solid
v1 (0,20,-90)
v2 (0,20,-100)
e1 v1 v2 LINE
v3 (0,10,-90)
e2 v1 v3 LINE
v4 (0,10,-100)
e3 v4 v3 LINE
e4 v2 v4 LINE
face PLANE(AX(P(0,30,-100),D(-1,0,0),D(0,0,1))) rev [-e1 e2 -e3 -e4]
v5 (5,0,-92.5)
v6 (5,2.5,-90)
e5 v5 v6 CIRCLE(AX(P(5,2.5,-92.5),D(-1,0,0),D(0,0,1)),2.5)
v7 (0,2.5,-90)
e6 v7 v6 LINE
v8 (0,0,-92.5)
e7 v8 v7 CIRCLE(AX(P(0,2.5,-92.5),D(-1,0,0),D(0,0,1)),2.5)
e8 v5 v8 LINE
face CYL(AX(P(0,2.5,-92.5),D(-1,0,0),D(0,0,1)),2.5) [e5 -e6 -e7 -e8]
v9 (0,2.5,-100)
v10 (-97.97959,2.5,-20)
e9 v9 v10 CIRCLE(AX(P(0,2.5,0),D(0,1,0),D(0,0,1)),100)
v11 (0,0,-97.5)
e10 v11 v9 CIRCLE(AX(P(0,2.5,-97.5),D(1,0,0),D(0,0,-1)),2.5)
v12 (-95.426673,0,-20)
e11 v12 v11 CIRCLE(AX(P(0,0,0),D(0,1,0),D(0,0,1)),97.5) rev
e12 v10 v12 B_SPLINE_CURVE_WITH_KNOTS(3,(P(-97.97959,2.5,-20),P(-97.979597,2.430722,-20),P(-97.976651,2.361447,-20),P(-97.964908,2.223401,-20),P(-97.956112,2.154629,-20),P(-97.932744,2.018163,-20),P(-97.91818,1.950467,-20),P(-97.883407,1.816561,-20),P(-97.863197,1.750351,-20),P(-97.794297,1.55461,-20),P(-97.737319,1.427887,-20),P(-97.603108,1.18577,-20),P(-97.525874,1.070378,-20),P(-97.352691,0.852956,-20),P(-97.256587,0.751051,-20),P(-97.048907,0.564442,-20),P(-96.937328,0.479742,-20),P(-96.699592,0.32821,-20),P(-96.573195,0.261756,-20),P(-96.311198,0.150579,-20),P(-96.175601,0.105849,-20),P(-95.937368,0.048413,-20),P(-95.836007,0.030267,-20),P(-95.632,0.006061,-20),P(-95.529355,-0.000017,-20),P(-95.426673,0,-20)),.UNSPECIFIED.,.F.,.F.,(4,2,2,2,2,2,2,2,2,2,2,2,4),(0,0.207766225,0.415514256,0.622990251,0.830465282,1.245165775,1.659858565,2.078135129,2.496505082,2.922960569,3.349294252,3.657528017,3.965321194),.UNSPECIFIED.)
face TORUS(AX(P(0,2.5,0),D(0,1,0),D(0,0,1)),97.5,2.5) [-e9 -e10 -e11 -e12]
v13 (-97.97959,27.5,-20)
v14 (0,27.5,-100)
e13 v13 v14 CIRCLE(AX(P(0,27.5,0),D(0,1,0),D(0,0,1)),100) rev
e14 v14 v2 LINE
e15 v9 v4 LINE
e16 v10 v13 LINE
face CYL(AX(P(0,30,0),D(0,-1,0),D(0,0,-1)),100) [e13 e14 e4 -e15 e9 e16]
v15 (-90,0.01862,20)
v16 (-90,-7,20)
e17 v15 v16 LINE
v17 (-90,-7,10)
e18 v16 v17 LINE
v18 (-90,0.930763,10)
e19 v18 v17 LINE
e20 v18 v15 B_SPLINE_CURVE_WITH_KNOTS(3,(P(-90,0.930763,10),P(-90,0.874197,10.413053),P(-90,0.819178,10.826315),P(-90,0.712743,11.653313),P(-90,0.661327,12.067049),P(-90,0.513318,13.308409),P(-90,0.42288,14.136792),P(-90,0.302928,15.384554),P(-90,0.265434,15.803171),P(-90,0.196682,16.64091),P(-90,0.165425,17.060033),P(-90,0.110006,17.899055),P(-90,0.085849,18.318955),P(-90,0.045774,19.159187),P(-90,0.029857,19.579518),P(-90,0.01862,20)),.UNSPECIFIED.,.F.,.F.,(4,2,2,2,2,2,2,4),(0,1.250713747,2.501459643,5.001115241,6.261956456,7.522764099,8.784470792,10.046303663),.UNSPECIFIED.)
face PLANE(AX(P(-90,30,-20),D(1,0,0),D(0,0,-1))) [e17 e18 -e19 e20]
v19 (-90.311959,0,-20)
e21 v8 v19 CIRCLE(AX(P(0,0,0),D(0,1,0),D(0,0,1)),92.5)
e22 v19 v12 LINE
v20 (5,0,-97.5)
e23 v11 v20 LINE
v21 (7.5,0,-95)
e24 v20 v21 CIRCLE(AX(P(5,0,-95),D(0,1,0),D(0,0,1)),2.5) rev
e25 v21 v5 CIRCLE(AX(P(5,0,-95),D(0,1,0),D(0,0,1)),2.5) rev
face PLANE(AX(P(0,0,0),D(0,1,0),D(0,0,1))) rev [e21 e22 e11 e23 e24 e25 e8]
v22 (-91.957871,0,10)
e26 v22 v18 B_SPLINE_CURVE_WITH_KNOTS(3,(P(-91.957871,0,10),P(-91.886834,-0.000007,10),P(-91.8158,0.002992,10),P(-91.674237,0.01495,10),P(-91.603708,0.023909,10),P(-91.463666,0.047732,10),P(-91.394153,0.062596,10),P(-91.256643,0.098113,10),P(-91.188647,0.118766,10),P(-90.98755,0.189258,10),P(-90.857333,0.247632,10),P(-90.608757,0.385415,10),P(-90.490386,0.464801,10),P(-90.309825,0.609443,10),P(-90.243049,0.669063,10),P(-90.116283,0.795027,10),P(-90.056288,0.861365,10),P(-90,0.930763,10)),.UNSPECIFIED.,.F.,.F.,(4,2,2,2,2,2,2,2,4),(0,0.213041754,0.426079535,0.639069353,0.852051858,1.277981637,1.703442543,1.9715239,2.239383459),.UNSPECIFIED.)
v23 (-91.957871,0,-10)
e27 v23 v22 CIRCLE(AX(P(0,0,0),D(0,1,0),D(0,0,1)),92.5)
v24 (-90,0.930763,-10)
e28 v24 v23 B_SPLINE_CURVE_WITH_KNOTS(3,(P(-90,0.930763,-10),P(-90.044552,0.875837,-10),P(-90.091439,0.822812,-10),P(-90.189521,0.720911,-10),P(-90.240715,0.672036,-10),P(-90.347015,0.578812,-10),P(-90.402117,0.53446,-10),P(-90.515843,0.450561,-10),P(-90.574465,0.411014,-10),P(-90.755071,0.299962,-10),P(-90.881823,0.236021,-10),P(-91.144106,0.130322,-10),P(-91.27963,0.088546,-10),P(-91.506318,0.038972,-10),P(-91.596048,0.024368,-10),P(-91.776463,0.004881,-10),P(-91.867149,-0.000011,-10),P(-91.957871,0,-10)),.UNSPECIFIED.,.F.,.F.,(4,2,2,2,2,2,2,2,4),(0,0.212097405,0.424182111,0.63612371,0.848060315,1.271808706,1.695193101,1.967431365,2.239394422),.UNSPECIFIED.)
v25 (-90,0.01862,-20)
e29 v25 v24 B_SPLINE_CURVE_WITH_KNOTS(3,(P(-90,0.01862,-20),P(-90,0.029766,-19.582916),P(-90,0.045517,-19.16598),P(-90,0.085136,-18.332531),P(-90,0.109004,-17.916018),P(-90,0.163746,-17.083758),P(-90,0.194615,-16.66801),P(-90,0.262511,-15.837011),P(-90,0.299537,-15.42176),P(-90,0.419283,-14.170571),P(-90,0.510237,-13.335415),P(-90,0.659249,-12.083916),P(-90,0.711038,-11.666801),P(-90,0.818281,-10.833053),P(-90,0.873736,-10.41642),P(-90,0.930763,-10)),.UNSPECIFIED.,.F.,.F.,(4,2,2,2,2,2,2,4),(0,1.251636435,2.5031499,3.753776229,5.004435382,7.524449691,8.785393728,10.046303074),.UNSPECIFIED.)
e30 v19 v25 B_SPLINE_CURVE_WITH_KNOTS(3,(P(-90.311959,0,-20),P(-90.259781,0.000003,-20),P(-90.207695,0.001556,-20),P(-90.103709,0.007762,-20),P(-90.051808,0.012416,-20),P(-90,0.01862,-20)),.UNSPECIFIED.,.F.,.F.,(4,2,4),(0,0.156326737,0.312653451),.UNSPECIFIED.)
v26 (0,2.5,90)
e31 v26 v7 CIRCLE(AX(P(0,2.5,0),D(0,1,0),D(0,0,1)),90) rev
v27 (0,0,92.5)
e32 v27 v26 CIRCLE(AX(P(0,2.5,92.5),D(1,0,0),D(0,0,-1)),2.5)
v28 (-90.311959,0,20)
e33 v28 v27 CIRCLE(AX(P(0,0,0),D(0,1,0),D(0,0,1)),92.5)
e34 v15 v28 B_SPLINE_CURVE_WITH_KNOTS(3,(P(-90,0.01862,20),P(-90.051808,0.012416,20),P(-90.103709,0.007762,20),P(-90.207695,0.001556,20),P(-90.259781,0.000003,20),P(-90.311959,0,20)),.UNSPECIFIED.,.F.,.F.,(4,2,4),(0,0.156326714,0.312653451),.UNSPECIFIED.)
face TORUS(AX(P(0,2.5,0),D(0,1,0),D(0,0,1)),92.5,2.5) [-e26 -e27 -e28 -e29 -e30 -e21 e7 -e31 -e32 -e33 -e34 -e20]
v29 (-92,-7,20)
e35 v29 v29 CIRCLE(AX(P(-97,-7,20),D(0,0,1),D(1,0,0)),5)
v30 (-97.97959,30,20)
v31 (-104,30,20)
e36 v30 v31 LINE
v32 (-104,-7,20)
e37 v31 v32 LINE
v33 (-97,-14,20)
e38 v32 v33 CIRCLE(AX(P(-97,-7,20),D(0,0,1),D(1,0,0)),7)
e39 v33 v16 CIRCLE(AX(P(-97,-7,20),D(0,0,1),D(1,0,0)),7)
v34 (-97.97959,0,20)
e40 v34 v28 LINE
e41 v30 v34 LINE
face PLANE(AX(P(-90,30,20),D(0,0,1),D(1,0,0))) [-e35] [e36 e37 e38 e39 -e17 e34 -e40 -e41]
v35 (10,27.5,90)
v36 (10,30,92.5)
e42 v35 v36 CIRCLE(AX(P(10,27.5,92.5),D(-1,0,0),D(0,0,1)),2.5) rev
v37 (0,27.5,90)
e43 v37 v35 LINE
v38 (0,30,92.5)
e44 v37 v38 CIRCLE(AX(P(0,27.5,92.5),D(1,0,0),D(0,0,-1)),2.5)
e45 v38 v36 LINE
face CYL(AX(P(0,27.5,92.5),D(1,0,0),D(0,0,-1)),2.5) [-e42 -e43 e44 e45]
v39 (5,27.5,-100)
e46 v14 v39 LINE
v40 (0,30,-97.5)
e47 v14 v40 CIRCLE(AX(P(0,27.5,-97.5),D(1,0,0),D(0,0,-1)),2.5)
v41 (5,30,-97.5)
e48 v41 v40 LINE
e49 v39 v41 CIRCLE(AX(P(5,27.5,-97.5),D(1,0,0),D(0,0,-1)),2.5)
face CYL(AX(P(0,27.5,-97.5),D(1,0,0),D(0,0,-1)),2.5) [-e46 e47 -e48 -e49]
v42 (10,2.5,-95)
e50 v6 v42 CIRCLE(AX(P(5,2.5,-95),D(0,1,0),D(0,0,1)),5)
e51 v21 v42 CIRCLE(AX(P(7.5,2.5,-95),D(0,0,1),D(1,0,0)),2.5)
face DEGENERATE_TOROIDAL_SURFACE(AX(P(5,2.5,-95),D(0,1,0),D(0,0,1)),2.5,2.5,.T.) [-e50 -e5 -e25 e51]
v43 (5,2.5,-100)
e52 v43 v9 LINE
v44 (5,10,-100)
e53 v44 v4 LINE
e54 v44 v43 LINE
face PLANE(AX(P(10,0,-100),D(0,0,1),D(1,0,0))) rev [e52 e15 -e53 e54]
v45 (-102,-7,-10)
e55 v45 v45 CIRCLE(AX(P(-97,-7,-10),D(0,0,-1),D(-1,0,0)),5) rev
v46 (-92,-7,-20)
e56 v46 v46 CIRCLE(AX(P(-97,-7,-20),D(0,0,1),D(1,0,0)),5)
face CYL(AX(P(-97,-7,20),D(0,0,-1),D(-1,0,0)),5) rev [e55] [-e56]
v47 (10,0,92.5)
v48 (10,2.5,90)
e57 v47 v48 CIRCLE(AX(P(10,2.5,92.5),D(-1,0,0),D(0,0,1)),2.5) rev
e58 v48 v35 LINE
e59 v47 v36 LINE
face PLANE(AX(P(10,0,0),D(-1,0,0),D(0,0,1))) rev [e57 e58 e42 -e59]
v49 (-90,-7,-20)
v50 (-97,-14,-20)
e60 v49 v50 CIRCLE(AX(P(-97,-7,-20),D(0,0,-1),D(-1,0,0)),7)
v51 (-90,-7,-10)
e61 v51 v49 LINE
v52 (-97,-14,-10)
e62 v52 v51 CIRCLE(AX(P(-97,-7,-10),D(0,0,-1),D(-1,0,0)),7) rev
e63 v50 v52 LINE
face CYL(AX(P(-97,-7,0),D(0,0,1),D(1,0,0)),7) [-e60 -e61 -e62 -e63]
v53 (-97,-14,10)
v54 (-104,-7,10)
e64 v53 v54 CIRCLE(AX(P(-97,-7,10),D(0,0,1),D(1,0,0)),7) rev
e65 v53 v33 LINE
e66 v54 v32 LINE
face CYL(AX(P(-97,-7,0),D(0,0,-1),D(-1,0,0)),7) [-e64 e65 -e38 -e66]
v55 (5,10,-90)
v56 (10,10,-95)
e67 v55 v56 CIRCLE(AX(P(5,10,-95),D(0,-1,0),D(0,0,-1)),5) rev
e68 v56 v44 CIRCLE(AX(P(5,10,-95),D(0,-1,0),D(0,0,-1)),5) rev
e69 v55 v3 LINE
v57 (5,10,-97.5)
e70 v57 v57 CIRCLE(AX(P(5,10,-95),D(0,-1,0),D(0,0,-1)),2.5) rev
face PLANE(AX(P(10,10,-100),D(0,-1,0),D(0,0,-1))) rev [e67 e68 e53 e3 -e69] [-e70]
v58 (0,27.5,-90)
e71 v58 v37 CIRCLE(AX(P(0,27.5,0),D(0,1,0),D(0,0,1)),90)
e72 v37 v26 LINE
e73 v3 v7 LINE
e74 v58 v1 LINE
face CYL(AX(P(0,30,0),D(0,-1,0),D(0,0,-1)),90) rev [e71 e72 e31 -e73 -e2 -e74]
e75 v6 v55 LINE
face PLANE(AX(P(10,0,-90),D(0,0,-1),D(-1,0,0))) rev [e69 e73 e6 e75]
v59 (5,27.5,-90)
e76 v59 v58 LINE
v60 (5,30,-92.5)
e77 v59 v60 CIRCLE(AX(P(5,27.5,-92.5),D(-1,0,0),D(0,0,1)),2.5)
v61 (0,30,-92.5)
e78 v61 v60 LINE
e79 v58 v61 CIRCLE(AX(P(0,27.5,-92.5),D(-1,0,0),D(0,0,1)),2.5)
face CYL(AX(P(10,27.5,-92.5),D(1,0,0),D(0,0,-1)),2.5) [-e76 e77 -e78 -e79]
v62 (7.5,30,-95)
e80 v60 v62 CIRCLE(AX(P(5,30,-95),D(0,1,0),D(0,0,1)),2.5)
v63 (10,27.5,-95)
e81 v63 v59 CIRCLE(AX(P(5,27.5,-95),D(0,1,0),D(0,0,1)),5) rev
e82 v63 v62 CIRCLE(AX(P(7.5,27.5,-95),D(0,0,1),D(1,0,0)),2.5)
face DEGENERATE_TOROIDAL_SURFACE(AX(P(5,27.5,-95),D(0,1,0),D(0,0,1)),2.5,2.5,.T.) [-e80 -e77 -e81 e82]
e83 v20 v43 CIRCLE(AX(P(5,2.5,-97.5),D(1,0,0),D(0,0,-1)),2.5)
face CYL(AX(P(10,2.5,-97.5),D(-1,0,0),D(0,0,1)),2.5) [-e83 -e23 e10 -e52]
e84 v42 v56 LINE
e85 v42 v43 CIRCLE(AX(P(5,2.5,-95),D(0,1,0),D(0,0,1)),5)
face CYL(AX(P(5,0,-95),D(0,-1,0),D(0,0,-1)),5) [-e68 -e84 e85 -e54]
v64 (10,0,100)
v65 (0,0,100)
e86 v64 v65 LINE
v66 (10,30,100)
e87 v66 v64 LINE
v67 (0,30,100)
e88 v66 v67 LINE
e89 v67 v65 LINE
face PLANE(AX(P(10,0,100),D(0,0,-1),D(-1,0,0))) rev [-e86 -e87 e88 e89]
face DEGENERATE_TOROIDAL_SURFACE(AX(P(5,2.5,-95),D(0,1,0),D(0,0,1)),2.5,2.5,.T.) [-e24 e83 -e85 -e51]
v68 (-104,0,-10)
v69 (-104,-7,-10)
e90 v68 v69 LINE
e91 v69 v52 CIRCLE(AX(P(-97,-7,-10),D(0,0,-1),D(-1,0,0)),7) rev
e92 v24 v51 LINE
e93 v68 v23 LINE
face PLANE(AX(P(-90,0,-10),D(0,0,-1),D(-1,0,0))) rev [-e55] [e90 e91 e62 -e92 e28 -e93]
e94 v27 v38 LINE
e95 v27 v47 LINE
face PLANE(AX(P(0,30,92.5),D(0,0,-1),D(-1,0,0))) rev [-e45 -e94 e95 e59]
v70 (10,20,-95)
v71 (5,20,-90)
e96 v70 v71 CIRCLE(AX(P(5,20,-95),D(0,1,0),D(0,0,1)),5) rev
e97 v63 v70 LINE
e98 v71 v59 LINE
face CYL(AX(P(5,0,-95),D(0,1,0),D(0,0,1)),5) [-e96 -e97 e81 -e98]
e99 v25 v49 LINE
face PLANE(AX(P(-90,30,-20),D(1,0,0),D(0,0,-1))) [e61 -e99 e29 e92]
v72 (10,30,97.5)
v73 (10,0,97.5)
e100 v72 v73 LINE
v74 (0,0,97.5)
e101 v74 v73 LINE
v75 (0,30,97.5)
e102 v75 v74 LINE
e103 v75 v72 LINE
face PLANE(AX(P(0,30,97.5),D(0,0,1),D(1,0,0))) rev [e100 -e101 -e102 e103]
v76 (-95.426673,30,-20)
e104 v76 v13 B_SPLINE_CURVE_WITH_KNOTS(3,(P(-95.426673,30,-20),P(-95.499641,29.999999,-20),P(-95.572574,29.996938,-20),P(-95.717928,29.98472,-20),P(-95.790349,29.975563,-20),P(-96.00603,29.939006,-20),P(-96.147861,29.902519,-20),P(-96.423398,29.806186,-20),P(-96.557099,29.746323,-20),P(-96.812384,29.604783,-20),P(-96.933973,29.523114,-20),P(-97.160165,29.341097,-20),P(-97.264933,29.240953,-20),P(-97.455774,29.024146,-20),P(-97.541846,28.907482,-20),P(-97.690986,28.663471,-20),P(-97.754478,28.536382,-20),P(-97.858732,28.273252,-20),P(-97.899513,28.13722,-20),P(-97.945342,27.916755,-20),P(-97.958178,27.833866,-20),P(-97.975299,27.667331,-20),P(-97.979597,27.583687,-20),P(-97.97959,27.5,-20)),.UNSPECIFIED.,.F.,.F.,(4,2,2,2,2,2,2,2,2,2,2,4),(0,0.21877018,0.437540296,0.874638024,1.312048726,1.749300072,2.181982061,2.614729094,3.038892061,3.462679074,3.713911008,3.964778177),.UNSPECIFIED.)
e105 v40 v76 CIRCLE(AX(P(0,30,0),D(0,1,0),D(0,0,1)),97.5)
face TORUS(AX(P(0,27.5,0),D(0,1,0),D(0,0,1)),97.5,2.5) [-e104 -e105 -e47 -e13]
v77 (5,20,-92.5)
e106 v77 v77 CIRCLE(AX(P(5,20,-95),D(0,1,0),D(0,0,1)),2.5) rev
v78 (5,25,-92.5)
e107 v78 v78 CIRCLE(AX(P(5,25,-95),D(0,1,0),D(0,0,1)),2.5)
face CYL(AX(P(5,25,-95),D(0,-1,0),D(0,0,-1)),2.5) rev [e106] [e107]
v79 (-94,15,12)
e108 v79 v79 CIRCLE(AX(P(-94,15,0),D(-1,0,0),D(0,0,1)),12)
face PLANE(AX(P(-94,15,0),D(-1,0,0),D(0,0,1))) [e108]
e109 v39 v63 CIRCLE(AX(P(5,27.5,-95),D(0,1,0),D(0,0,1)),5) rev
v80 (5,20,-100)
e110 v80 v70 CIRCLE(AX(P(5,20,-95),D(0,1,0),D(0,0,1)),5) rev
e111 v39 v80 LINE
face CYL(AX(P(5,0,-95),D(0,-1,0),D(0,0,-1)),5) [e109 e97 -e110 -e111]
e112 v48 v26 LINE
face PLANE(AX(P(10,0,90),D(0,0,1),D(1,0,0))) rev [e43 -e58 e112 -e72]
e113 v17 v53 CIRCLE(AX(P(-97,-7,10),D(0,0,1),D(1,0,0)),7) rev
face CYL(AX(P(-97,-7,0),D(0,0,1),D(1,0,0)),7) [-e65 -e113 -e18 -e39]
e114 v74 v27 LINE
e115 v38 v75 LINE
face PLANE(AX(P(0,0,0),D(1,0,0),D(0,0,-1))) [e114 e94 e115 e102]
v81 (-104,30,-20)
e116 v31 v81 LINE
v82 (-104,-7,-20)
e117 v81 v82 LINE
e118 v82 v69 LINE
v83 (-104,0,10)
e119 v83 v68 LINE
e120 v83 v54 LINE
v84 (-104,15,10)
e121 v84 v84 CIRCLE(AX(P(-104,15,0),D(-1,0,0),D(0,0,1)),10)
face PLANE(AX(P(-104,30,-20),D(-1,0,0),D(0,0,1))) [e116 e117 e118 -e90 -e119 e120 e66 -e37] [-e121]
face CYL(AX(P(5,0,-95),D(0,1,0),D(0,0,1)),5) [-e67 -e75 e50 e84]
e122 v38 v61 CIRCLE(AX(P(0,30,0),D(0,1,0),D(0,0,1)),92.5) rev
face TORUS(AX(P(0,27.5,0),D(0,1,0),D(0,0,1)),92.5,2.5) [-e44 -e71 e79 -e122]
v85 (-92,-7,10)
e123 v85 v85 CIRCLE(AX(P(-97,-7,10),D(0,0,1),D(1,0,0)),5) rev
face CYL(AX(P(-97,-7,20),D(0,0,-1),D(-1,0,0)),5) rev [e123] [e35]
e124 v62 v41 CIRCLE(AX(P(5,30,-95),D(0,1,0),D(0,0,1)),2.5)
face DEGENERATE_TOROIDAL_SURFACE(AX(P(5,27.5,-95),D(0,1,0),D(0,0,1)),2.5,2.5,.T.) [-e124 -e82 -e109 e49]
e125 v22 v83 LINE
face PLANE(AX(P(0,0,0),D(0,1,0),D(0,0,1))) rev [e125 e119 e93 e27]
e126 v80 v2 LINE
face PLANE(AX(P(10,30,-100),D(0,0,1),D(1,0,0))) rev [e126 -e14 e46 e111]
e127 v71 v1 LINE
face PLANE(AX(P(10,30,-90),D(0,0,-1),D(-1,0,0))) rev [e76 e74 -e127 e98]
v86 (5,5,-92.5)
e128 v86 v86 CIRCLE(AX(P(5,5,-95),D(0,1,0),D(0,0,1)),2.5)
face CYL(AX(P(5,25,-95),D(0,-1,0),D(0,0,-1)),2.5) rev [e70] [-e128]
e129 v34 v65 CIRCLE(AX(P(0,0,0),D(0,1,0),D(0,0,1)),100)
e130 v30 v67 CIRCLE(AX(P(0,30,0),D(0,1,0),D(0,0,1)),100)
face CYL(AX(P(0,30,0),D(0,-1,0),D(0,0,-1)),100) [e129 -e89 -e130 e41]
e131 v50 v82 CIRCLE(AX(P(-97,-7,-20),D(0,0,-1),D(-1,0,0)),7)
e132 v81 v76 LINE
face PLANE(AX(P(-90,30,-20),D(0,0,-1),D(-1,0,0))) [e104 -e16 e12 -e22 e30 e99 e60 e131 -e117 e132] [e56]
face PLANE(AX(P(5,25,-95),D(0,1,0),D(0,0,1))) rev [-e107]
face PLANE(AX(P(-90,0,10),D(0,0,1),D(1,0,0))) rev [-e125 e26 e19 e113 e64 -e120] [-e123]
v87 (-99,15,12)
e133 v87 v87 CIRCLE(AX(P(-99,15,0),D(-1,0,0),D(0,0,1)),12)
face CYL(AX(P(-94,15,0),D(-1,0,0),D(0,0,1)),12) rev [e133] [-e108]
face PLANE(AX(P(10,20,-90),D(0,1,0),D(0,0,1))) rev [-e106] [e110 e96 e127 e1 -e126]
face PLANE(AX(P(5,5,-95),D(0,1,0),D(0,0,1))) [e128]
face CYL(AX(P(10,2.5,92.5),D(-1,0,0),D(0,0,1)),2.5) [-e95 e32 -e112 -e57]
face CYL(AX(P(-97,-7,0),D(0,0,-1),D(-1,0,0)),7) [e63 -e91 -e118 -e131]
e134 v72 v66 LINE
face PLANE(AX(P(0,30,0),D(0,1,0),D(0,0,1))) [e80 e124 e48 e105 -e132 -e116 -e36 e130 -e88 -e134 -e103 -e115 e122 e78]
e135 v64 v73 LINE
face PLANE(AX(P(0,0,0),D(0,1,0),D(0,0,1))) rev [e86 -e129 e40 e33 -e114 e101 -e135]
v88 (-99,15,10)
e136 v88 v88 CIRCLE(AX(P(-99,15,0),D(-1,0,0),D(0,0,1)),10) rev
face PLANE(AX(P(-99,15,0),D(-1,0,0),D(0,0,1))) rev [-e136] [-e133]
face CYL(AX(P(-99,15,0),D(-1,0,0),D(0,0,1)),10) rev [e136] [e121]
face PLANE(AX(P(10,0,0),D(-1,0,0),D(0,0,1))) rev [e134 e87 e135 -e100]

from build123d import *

# Parameters (mm, degrees)
BOSS_EXTRUDE1_DEPTH      = 30
BOSS_EXTRUDE2_DEPTH      = 14
BOSS_EXTRUDE2_DEPTH_BACK = 30
SKETCH2_W                = 14
SKETCH2_H                = 40
SKETCH3_W                = 14
SKETCH3_H                = 20
CUT_EXTRUDE1_DEPTH       = 14
CUT_EXTRUDE2_DEPTH       = 20
CUT_EXTRUDE2_DEPTH_BACK  = 20
SKETCH5_R                = 5
SKETCH6_W                = 10
SKETCH6_H                = 10
BOSS_EXTRUDE3_DEPTH      = 10
CUT_EXTRUDE3_DEPTH       = 15
CUT_EXTRUDE3_DEPTH_BACK  = 5
SKETCH7_R                = 2.5
SKETCH8_W                = 10
SKETCH8_H                = 30
BOSS_EXTRUDE4_DEPTH      = 10
SKETCH9_W                = 5
SKETCH9_H                = 30
CUT_EXTRUDE4_DEPTH       = 10
SKETCH10_R               = 10
CUT_EXTRUDE5_DEPTH       = 5
SKETCH11_R               = 12
CUT_EXTRUDE6_DEPTH       = 5
FILLET1_R                = 7
FILLET3_R                = 5
FILLET2_R                = 2.5


# Some blends are built 0.0001 mm under size
with BuildPart() as part:
    # Sketch1 → Boss-Extrude1 (new body)
    with BuildSketch(Plane(origin=(0, 0, 0), x_dir=(1, 0, 0), z_dir=(0, 1, 0))):
        with BuildLine():
            Line((0, 100), (0, 90))
            ThreePointArc((0, 90), (-90, 0), (0, -90))
            Line((0, -90), (0, -100))
            ThreePointArc((0, -100), (-100, 0), (0, 100))
        make_face()
    extrude(amount=BOSS_EXTRUDE1_DEPTH)

    # Sketch2 → Boss-Extrude2 (add, two sides: drawn at the far end of the back side and taken through both)
    with BuildSketch(Plane.XZ.offset(-BOSS_EXTRUDE2_DEPTH_BACK)):
        with Locations((-97, 0)):
            Rectangle(SKETCH2_W, SKETCH2_H)
    extrude(amount=BOSS_EXTRUDE2_DEPTH + BOSS_EXTRUDE2_DEPTH_BACK)

    # Sketch3 → Cut-Extrude1 (cut)
    with BuildSketch(Plane.XZ.offset(14)):
        with Locations((-97, 0)):
            Rectangle(SKETCH3_W, SKETCH3_H)
    extrude(amount=-CUT_EXTRUDE1_DEPTH, mode=Mode.SUBTRACT)

    # Sketch5 → Cut-Extrude2 (cut, two sides: drawn at the far end of the back side and taken through both)
    with BuildSketch(Plane.XY.offset(-CUT_EXTRUDE2_DEPTH_BACK)):
        with Locations((-97, -7)):
            Circle(SKETCH5_R)
    extrude(amount=CUT_EXTRUDE2_DEPTH + CUT_EXTRUDE2_DEPTH_BACK, mode=Mode.SUBTRACT)

    # Sketch6 → Boss-Extrude3 (add)
    with BuildSketch(Plane(origin=(0, 0, 0), x_dir=(0, 0, -1), z_dir=(1, 0, 0))):
        with Locations((95, 25)):
            Rectangle(SKETCH6_W, SKETCH6_H)
        with Locations((95, 5)):
            Rectangle(SKETCH6_W, SKETCH6_H)
    extrude(amount=BOSS_EXTRUDE3_DEPTH)

    # Sketch7 → Cut-Extrude3 (cut, two sides: drawn at the far end of the back side and taken through both)
    with BuildSketch(Plane(origin=(0, 10, 0), x_dir=(1, 0, 0), z_dir=(0, 1, 0)).offset(-CUT_EXTRUDE3_DEPTH_BACK)):
        with Locations(Location((5, 95, 0), (0, 0, 90))):
            Circle(SKETCH7_R)
    extrude(amount=CUT_EXTRUDE3_DEPTH + CUT_EXTRUDE3_DEPTH_BACK, mode=Mode.SUBTRACT)

    # Sketch8 → Boss-Extrude4 (add)
    with BuildSketch(Plane(origin=(0, 0, 0), x_dir=(0, 0, -1), z_dir=(1, 0, 0))):
        with Locations((-95, 15)):
            Rectangle(SKETCH8_W, SKETCH8_H)
    extrude(amount=BOSS_EXTRUDE4_DEPTH)

    # Sketch9 → Cut-Extrude4 (cut)
    with BuildSketch(Plane(origin=(10, 0, 0), x_dir=(0, 0, -1), z_dir=(1, 0, 0))):
        with Locations((-95, 15)):
            Rectangle(SKETCH9_W, SKETCH9_H)
    extrude(amount=-CUT_EXTRUDE4_DEPTH, mode=Mode.SUBTRACT)

    # Sketch10 → Cut-Extrude5 (cut)
    with BuildSketch(Plane.ZY.offset(104)):
        with Locations((0, 15)):
            Circle(SKETCH10_R)
    extrude(amount=-CUT_EXTRUDE5_DEPTH, mode=Mode.SUBTRACT)

    # Sketch11 → Cut-Extrude6 (cut)
    with BuildSketch(Plane.ZY.offset(99)):
        with Locations((0, 15)):
            Circle(SKETCH11_R)
    extrude(amount=-CUT_EXTRUDE6_DEPTH, mode=Mode.SUBTRACT)

    # Fillet1
    fillet1_edges = [part.edges().sort_by_distance(p)[0] for p in [
        (-104, -14, -15),
        (-90, -14, -15),
        (-104, -14, 15),
        (-90, -14, 15),
    ]]
    fillet(fillet1_edges, radius=FILLET1_R - 0.0001)  # a hair under: the kernel refuses the full size

    # Fillet3
    fillet3_edges = [part.edges().sort_by_distance(p)[0] for p in [
        (10, 5, -90),
        (10, 5, -100),
        (10, 25, -100),
        (10, 25, -90),
    ]]
    fillet(fillet3_edges, radius=FILLET3_R - 0.0001)  # a hair under: the kernel refuses the full size

    # Fillet2
    # the kernel refuses this fillet: 2.5 mm, written as the material it takes off along each edge
    with BuildSketch(Plane(origin=(0, 0, 90), x_dir=(0, 0, 1), z_dir=(1, 0, 0)), Plane(origin=(0, 30, 90), x_dir=(0, -1, 0), z_dir=(1, 0, 0))) as fillet2_piece_1:
        with BuildLine():
            CenterArc((FILLET2_R, -FILLET2_R), FILLET2_R, 90, 90)
            Line((0, -FILLET2_R), (0, 0))
            Line((0, 0), (FILLET2_R, 0))
        make_face()
    extrude(amount=16.25, mode=Mode.SUBTRACT)
    with BuildSketch(Plane(origin=(0, 0, -90), x_dir=(0, 0, -1), z_dir=(1, 0, 0)), Plane(origin=(0, 30, -90), x_dir=(0, -1, 0), z_dir=(1, 0, 0)), Plane(origin=(0, 30, -100), x_dir=(0, 0, 1), z_dir=(1, 0, 0))) as fillet2_piece_2:
        with BuildLine():
            CenterArc((FILLET2_R, FILLET2_R), FILLET2_R, 180, 90)
            Line((0, FILLET2_R), (0, 0))
            Line((0, 0), (FILLET2_R, 0))
        make_face()
    extrude(amount=5.0001, mode=Mode.SUBTRACT)
    with BuildSketch(Plane(origin=(0, 0, 0), x_dir=(0, 0, 1), z_dir=(1, 0, 0))) as fillet2_piece_3_section:
        with BuildLine():
            CenterArc((90 + FILLET2_R, -FILLET2_R), FILLET2_R, 90, 90)
            Line((90, -FILLET2_R), (90, 0))
            Line((90, 0), (90 + FILLET2_R, 0))
        make_face()
    fillet2_piece_3 = revolve(axis=Axis((0, 0, 0), (0, -1, 0)), revolution_arc=180, mode=Mode.PRIVATE)
    fillet2_piece_3 = split(fillet2_piece_3, bisect_by=Plane(origin=(-90, 0.417646948, 90.51789801), z_dir=(1, 0, 0)), keep=Keep.TOP, mode=Mode.PRIVATE)
    add(fillet2_piece_3, mode=Mode.SUBTRACT)
    with BuildSketch(Plane(origin=(0, 0, 0), x_dir=(0, 0, 1), z_dir=(1, 0, 0))) as fillet2_piece_4_section:
        with BuildLine():
            CenterArc((90 + FILLET2_R, -FILLET2_R), FILLET2_R, 90, 90)
            Line((90, -FILLET2_R), (90, 0))
            Line((90, 0), (90 + FILLET2_R, 0))
        make_face()
    fillet2_piece_4 = revolve(axis=Axis((0, 0, 0), (0, -1, 0)), revolution_arc=180, mode=Mode.PRIVATE)
    fillet2_piece_4 = split(fillet2_piece_4, bisect_by=Plane(origin=(-90.062527527, 0.003732432, 20), z_dir=(0, 0, 1)), keep=Keep.TOP, mode=Mode.PRIVATE)
    add(fillet2_piece_4, mode=Mode.SUBTRACT)
    with BuildSketch(Plane(origin=(0, 0, 0), x_dir=(0, 0, 1), z_dir=(1, 0, 0))) as fillet2_piece_5_section:
        with BuildLine():
            CenterArc((90 + FILLET2_R, -FILLET2_R), FILLET2_R, 90, 90)
            Line((90, -FILLET2_R), (90, 0))
            Line((90, 0), (90 + FILLET2_R, 0))
        make_face()
    fillet2_piece_5 = revolve(axis=Axis((0, 0, 0), (0, -1, 0)), revolution_arc=180, mode=Mode.PRIVATE)
    fillet2_piece_5 = split(fillet2_piece_5, bisect_by=Plane(origin=(-90.540406948, 0.460795961, -10), z_dir=(0, 0, 1)), keep=Keep.TOP, mode=Mode.PRIVATE)
    fillet2_piece_5 = split(fillet2_piece_5, bisect_by=Plane(origin=(-90.540406948, 0.460795961, 10), z_dir=(0, 0, -1)), keep=Keep.TOP, mode=Mode.PRIVATE)
    add(fillet2_piece_5, mode=Mode.SUBTRACT)
    with BuildSketch(Plane(origin=(0, 0, 0), x_dir=(0, 0, 1), z_dir=(1, 0, 0))) as fillet2_piece_6_section:
        with BuildLine():
            CenterArc((90 + FILLET2_R, -FILLET2_R), FILLET2_R, 90, 90)
            Line((90, -FILLET2_R), (90, 0))
            Line((90, 0), (90 + FILLET2_R, 0))
        make_face()
    fillet2_piece_6 = revolve(axis=Axis((0, 0, 0), (0, -1, 0)), revolution_arc=180, mode=Mode.PRIVATE)
    fillet2_piece_6 = split(fillet2_piece_6, bisect_by=Plane(origin=(-90.062527448, 0.003732432, -20), z_dir=(0, 0, -1)), keep=Keep.TOP, mode=Mode.PRIVATE)
    add(fillet2_piece_6, mode=Mode.SUBTRACT)
    with BuildSketch(Plane(origin=(0, 30, 0), x_dir=(0, 0, -1), z_dir=(1, 0, 0))) as fillet2_piece_7:
        with BuildLine():
            CenterArc((90 + FILLET2_R, -FILLET2_R), FILLET2_R, 90, 90)
            Line((90 + FILLET2_R, 0), (90, 0))
            Line((90, 0), (90, -FILLET2_R))
        make_face()
    revolve(axis=Axis((0, 30, 0), (0, 1, 0)), revolution_arc=180, mode=Mode.SUBTRACT)
    with BuildSketch(Plane(origin=(0, 0, 0), x_dir=(-0.9903773605712586, 0, -0.1383932211775821), z_dir=(-0.1383932211775821, 0, 0.9903773605712586))) as fillet2_piece_8_section:
        with BuildLine():
            CenterArc((100 - FILLET2_R, -FILLET2_R), FILLET2_R, 0, 90)
            Line((100, -FILLET2_R), (100, 0))
            Line((100, 0), (100 - FILLET2_R, 0))
        make_face()
    fillet2_piece_8 = revolve(axis=Axis((0, 0, 0), (0, -1, 0)), revolution_arc=82.045120461, mode=Mode.PRIVATE)
    fillet2_piece_8 = split(fillet2_piece_8, bisect_by=Plane(origin=(-62.807815321, 0.692124363, -20), z_dir=(0, 0, -1)), keep=Keep.TOP, mode=Mode.PRIVATE)
    add(fillet2_piece_8, mode=Mode.SUBTRACT)
    with BuildSketch(Plane(origin=(0, 0, -100), x_dir=(0, 0, 1), z_dir=(1, 0, 0))) as fillet2_piece_9:
        with BuildLine():
            CenterArc((FILLET2_R, -FILLET2_R), FILLET2_R, 90, 90)
            Line((0, -FILLET2_R), (0, 0))
            Line((0, 0), (FILLET2_R, 0))
        make_face()
    extrude(amount=5.0001, mode=Mode.SUBTRACT)
    with BuildSketch(Plane(origin=(5.0001, 0, -95.0001), x_dir=(1, 0, 0), z_dir=(0, 0, 1))) as fillet2_piece_10:
        with BuildLine():
            CenterArc((4.9999 - FILLET2_R, FILLET2_R), FILLET2_R, 270, 90)
            Line((4.9999, FILLET2_R), (4.9999, 0))
            Line((4.9999, 0), (4.9999 - FILLET2_R, 0))
        make_face()
    revolve(axis=Axis((5.0001, 0, -95.0001), (0, 1, 0)), revolution_arc=90, mode=Mode.SUBTRACT)
    with BuildSketch(Plane(origin=(5.0001, 0, -94.9999), x_dir=(0, 0, 1), z_dir=(-1, 0, 0))) as fillet2_piece_11:
        with BuildLine():
            CenterArc((4.9999 - FILLET2_R, FILLET2_R), FILLET2_R, 270, 90)
            Line((4.9999, FILLET2_R), (4.9999, 0))
            Line((4.9999, 0), (4.9999 - FILLET2_R, 0))
        make_face()
    revolve(axis=Axis((5.0001, 0, -94.9999), (0, 1, 0)), revolution_arc=90, mode=Mode.SUBTRACT)
    with BuildSketch(Plane(origin=(0, 30, 0), x_dir=(-0.9903773605712582, 0, -0.13839322117758568), z_dir=(-0.13839322117758568, 0, 0.9903773605712582))) as fillet2_piece_12_section:
        with BuildLine():
            CenterArc((100 - FILLET2_R, FILLET2_R), FILLET2_R, 270, 90)
            Line((100 - FILLET2_R, 0), (100, 0))
            Line((100, 0), (100, FILLET2_R))
        make_face()
    fillet2_piece_12 = revolve(axis=Axis((0, 30, 0), (0, -1, 0)), revolution_arc=82.045120461, mode=Mode.PRIVATE)
    fillet2_piece_12 = split(fillet2_piece_12, bisect_by=Plane(origin=(-62.807815321, 29.307875637, -20), z_dir=(0, 0, -1)), keep=Keep.TOP, mode=Mode.PRIVATE)
    add(fillet2_piece_12, mode=Mode.SUBTRACT)
    with BuildSketch(Plane(origin=(5.0001, 30, -95.0001), x_dir=(0, 0, -1), z_dir=(-1, 0, 0))) as fillet2_piece_13:
        with BuildLine():
            CenterArc((4.9999 - FILLET2_R, FILLET2_R), FILLET2_R, 270, 90)
            Line((4.9999, FILLET2_R), (4.9999, 0))
            Line((4.9999, 0), (4.9999 - FILLET2_R, 0))
        make_face()
    revolve(axis=Axis((5.0001, 30, -95.0001), (0, -1, 0)), revolution_arc=90, mode=Mode.SUBTRACT)
    with BuildSketch(Plane(origin=(5.0001, 30, -94.9999), x_dir=(0, 0, 1), z_dir=(-1, 0, 0))) as fillet2_piece_14:
        with BuildLine():
            CenterArc((4.9999 - FILLET2_R, -FILLET2_R), FILLET2_R, 0, 90)
            Line((4.9999, -FILLET2_R), (4.9999, 0))
            Line((4.9999, 0), (4.9999 - FILLET2_R, 0))
        make_face()
    revolve(axis=Axis((5.0001, 30, -94.9999), (0, 1, 0)), revolution_arc=90, mode=Mode.SUBTRACT)
    with BuildSketch(Plane(origin=(10, 30, -94.9999), x_dir=(-1, 0, 0), z_dir=(0, 0, -1)), Plane(origin=(10, 0, -95.0001), x_dir=(-1, 0, 0), z_dir=(0, 0, 1))) as fillet2_piece_15:
        with BuildLine():
            CenterArc((FILLET2_R, -FILLET2_R), FILLET2_R, 90, 90)
            Line((0, -FILLET2_R), (0, 0))
            Line((0, 0), (FILLET2_R, 0))
        make_face()
    extrude(amount=0.0002, mode=Mode.SUBTRACT)


solid = part.part
